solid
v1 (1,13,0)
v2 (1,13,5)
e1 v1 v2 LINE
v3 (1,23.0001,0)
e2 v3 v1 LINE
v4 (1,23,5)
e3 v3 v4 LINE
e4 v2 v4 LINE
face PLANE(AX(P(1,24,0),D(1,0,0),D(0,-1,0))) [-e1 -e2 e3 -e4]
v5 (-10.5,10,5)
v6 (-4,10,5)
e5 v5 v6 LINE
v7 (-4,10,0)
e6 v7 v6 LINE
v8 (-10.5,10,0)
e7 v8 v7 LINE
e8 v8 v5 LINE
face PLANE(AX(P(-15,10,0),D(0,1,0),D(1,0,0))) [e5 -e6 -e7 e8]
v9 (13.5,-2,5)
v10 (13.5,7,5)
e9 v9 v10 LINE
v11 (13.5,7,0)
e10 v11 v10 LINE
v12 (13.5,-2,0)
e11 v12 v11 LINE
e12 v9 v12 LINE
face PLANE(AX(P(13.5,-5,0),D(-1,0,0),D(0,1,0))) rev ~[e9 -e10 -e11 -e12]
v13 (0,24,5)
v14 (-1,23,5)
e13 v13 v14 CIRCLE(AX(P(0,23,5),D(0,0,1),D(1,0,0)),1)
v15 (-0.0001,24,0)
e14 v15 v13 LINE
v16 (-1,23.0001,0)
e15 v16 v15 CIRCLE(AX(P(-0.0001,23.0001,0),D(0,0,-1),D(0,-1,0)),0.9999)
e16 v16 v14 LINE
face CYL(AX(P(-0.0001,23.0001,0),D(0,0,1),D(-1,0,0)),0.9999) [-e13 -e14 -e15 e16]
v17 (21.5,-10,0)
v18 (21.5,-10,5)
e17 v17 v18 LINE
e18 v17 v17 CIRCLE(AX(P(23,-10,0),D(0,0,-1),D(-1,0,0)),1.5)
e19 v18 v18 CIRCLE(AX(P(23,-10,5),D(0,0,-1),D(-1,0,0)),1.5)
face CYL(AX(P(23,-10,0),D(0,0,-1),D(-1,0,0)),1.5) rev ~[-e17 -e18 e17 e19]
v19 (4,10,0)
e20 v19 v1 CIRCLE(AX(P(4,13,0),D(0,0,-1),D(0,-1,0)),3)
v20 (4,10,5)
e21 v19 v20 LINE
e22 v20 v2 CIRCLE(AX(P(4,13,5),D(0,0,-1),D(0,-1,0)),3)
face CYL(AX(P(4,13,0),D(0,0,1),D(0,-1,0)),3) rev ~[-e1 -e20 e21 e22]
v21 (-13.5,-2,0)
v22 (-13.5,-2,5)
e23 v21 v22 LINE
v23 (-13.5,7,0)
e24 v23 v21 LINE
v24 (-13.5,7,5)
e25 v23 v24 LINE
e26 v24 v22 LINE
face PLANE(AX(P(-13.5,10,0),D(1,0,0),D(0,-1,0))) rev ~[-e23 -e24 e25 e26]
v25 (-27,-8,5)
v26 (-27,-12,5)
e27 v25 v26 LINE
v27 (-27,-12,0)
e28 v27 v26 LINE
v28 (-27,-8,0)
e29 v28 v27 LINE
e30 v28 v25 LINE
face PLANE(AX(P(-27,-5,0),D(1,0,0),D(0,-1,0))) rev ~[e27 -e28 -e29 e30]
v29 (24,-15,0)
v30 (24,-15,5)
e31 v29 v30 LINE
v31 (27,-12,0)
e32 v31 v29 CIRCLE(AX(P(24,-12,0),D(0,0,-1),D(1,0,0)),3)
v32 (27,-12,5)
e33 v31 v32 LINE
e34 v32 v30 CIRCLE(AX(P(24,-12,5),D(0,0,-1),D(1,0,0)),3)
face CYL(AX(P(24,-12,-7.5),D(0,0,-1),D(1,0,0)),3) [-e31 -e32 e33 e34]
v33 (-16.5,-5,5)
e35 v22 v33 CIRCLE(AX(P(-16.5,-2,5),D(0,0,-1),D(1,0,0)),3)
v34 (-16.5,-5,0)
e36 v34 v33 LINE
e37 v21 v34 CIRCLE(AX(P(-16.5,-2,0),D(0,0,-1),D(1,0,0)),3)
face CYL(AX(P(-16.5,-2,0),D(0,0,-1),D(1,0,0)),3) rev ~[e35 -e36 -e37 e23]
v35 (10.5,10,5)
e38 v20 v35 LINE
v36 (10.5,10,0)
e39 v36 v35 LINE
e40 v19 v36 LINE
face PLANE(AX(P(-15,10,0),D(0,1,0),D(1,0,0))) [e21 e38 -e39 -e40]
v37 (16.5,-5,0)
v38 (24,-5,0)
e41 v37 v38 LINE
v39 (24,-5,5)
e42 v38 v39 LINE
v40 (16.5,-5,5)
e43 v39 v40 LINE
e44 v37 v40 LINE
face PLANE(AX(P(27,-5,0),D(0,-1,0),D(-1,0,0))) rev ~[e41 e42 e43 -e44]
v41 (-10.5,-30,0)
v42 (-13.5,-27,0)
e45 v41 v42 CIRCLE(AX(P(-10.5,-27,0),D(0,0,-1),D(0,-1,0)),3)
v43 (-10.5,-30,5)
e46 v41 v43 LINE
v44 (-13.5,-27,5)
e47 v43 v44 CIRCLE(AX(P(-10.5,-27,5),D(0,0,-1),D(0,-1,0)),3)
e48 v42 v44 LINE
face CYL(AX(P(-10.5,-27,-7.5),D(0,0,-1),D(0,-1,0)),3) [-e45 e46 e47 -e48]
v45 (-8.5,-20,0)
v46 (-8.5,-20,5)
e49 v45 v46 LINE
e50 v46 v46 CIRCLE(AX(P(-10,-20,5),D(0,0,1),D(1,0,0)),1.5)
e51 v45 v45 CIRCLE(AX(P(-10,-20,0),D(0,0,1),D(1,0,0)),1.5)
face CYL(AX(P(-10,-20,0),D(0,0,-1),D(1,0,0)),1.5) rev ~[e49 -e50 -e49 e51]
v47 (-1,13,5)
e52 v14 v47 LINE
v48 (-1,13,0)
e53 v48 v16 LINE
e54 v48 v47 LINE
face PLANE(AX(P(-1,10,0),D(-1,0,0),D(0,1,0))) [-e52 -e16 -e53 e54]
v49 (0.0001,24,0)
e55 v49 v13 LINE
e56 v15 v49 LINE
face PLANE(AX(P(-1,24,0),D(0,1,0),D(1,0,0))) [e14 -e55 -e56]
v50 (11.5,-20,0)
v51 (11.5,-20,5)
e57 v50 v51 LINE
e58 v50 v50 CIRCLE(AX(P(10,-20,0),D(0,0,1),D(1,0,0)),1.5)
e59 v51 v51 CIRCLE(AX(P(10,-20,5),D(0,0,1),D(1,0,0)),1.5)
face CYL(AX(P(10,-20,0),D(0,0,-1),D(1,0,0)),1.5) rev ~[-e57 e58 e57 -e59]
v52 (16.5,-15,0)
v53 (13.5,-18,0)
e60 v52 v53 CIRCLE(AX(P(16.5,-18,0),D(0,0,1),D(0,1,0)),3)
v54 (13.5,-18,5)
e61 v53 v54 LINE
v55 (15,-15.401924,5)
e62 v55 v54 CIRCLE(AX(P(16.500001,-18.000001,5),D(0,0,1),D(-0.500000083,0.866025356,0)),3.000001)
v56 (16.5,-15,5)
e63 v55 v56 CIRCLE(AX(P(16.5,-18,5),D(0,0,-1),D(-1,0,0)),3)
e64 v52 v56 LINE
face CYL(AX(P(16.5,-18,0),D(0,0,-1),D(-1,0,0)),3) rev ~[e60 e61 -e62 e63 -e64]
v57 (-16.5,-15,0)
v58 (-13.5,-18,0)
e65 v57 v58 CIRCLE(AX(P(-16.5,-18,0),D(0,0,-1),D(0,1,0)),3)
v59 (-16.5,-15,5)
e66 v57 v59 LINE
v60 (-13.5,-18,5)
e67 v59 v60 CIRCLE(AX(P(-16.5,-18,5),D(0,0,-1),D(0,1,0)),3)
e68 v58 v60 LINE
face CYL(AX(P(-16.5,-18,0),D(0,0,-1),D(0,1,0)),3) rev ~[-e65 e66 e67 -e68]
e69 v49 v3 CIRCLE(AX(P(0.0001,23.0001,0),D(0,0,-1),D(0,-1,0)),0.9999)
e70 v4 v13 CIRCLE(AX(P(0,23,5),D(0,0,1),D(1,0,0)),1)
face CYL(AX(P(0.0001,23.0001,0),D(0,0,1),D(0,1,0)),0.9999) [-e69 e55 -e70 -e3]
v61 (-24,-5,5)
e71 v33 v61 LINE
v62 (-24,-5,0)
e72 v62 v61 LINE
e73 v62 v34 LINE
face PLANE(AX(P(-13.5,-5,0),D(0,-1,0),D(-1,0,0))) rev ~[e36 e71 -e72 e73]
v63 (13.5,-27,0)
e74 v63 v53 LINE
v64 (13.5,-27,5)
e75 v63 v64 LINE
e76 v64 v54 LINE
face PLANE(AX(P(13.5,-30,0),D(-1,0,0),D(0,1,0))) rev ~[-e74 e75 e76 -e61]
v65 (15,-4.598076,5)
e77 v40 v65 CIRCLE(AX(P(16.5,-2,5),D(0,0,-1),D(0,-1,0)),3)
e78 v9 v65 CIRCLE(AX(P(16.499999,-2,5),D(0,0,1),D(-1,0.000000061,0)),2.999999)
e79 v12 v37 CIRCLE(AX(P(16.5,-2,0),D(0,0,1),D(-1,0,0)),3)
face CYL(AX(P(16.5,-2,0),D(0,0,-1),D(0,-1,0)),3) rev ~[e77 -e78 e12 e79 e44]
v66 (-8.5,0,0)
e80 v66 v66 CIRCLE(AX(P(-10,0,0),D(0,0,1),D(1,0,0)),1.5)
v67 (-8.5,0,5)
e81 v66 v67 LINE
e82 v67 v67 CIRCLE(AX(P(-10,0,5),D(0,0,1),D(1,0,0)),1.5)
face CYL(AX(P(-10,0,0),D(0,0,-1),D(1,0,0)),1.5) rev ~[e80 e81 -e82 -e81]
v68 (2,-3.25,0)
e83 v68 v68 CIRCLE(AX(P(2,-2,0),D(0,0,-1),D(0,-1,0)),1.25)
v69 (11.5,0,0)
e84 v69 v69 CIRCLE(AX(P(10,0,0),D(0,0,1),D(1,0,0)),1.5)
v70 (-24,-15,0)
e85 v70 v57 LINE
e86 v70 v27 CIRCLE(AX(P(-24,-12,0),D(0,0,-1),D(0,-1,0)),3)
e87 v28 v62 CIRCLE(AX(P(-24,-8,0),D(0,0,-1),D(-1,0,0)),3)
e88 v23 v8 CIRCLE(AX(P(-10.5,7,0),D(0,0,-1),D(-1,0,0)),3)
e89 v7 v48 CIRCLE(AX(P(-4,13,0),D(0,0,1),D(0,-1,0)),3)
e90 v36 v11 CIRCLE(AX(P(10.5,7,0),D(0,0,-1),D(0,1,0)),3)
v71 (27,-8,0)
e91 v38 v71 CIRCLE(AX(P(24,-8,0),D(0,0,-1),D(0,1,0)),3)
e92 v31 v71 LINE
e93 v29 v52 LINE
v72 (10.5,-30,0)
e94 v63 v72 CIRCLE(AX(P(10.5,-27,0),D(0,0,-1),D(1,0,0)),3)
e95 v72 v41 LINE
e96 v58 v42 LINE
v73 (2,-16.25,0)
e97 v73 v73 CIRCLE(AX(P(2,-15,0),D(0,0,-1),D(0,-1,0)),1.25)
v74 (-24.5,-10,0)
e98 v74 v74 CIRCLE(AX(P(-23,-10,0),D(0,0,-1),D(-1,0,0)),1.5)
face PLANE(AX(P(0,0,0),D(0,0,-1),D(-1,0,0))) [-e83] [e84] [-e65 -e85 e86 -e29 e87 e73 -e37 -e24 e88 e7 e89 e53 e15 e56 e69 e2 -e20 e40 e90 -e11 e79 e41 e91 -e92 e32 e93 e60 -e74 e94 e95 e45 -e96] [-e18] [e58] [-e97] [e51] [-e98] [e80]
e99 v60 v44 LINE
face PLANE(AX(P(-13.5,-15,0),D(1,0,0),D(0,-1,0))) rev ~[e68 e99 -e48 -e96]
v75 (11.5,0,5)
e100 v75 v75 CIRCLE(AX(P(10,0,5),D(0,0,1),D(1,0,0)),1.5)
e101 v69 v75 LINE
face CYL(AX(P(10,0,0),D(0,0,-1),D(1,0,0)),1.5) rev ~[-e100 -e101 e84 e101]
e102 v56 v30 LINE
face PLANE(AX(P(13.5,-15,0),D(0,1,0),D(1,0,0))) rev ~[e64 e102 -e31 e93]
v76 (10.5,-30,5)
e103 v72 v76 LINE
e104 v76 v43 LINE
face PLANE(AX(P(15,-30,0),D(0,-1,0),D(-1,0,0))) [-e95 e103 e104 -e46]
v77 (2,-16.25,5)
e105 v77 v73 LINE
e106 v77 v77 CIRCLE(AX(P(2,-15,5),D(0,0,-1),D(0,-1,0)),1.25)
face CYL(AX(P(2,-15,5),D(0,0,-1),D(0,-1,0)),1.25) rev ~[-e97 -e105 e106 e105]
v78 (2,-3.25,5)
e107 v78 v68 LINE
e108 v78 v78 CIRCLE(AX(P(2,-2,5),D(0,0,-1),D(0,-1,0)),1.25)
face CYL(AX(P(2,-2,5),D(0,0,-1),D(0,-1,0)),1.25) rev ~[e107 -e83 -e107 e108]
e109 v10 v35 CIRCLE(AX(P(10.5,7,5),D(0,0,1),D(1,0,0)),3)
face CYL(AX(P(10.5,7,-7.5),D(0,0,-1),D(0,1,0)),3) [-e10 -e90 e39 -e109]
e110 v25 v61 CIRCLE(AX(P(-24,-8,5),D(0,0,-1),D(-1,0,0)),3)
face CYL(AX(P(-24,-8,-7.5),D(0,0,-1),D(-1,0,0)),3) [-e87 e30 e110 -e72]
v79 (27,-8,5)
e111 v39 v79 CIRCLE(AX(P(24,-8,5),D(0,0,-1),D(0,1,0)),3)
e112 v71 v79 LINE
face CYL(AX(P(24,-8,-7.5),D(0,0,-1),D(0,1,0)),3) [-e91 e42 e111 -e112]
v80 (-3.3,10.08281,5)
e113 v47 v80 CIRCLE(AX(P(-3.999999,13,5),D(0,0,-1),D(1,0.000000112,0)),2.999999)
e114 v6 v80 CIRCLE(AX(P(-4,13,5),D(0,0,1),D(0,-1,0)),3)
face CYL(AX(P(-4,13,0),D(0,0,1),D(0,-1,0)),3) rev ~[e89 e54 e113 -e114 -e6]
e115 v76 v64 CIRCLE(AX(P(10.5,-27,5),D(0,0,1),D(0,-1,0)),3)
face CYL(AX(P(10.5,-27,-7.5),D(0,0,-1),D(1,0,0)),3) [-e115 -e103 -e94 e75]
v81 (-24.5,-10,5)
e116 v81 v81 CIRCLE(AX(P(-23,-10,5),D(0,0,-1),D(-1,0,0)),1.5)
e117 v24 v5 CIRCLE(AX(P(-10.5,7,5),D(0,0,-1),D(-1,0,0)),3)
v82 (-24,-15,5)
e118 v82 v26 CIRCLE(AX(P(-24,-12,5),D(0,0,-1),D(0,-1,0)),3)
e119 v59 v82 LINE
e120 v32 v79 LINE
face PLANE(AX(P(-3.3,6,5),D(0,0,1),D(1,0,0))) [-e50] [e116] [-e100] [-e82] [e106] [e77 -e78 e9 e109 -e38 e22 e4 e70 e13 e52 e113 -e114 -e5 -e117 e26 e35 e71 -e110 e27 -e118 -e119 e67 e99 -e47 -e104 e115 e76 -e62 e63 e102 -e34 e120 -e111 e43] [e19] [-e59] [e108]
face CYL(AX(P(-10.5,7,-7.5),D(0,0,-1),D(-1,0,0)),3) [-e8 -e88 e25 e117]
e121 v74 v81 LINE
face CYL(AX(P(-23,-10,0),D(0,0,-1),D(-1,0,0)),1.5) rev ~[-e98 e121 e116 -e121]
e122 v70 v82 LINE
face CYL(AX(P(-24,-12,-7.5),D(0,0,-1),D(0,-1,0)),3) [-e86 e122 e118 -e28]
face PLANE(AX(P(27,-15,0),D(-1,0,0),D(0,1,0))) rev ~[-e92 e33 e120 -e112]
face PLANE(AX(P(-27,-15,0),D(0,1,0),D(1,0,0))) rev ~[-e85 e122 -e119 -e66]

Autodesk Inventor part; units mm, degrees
ref_plane "YZ Plane" through (0, 0, 0) normal (1, 0, 0) x (0, 1, 0)
ref_plane "XZ Plane" through (0, 0, 0) normal (0, 1, 0) x (-1, 0, 0)
ref_plane "XY Plane" through (0, 0, 0) normal (0, 0, 1) x (1, 0, 0)
sketch "Sketch1" plane through (0, 0, 0) normal (0, 0, 1) x (1, 0, 0)
  circle A0 centre (-10, 0) radius 1.5
  circle A1 centre (10, 0) radius 1.5
  circle A2 centre (-10, -20) radius 1.5
  circle A3 centre (10, -20) radius 1.5
  line L0 (-15, 10) -> (15, 10)
  line L1 (15, 10) -> (15, -30)
  line L2 (15, -30) -> (-15, -30)
  line L3 (-15, -30) -> (-15, 10)
  point P0 (0, 0)
  dimension "d0" = 3
  dimension "d1" = 3
  dimension "d2" = 20
  dimension "d3" = 10
  dimension "d4" = 3
  dimension "d5" = 3
  dimension "d6" = 20
  dimension "d7" = 20
  dimension "d8" = 20
  dimension "d9" = 10
  dimension "d10" = 30
  dimension "d11" = 15
  dimension "d12" = 40
  dimension "d13" = 10
extrude "Extrusion1" add sketch "Sketch1" along normal blind 5
sketch "Sketch2" plane through (0, 0, 5) normal (0, 0, 1) x (1, 0, 0)
  line L0 (0, 15.442053) -> (0, -37.541934) construction
  line L1 (-4, 15.442053) -> (-4, -37.541934) construction
  line L2 (-15, -30) -> (15, -30) construction
  line L3 (15, 10) -> (-15, 10)
  line L4 (15, -30) -> (15, 10)
  line L5 (7, 10) -> (7, -30)
  line L6 (7, 10) -> (15, 10)
  line L7 (7, -30) -> (15, -30)
  line L8 (6.3, 15.442053) -> (6.3, 10) construction
  line L9 (6.3, -30) -> (6.3, -37.541934) construction
  line L10 (-15, 10) -> (-15, -30)
  line L11 (15, -30) -> (15, 10)
  point P0 (0, 0)
  dimension "d16" = 4
  dimension "d96" = 0
  dimension "d97" = 0
  dimension "d141" = 22
  dimension "d152" = 0
extrude "Extrusion2" add sketch "Sketch2" along normal blind 10
sketch "Sketch4" plane through (0, 0, 15) normal (0, 0, 1) x (1, 0, 0)
  circle A0 centre (10, 0) radius 3.25
  circle A1 centre (10, -20) radius 1.5 projected
  circle A2 centre (10, -20) radius 3.25
  point P0 (0, 0)
  point P1 (8.5, 0)
  point P2 (8.5, -20)
  dimension "d37" = 6.5
  dimension "d38" = 6.5
extrude "Extrusion3" [suppressed]
sketch "Sketch5" plane through (0, 0, 5) normal (0, 0, 1) x (1, 0, 0)
  line L0 (-4, 15.442053) -> (-4, -37.541934) construction
  line L1 (15, -30) -> (-15, -30)
  line L2 (7, 10) -> (-15, 10)
  line L3 (-3.3, 10) -> (1, 10)
  line L4 (4.5, -30) -> (-3.3, -30)
  line L5 (-3.3, -30) -> (-3.3, 10)
  line L6 (-2, 6) -> (1, 6)
  line L7 (4.5, -26) -> (-2, -26)
  line L8 (-2, -26) -> (-2, 6)
  line L9 (1, 10) -> (1, 6)
  line L10 (4.5, -26) -> (4.5, -30)
  line L11 (7, 10) -> (7, -30)
  point P0 (0, 0)
  point P1 (6.3, 10)
  point P2 (6.3, -30)
  point P3 (15, 10)
  dimension "d111" = 0.7
  dimension "d112" = 4
  dimension "d115" = 4
  dimension "d116" = 1.3
  dimension "d117" = 6
  dimension "d118" = 2.5
  dimension "d139" = 0
  dimension "d140" = 0
extrude "Extrusion4" add sketch "Sketch5" along normal up to surface (10 mm away) contours L1 L5 L2 L9 L6 L8 L7 L10
sketch "Sketch8" plane through (0, 0, 0) normal (0, 0, -1) x (-1, 0, 0)
  line L0 (27, -15) -> (-27, -15)
  line L1 (-27, -15) -> (-27, -5)
  line L2 (-27, -5) -> (27, -5)
  line L3 (27, -5) -> (27, -15)
  line L4 (15, 10) -> (-15, 10) projected
  line L5 (-15, -30) -> (15, -30) projected
  circle A0 centre (23, -10) radius 1.5
  circle A1 centre (-23, -10) radius 1.5
  point P0 (0, 0)
  dimension "d77" = 10
  dimension "d78" = 40
  dimension "d79" = 15
  dimension "d80" = 3
  dimension "d81" = 3
  dimension "d82" = 46
  dimension "d83" = 54
  dimension "d84" = 23
  dimension "d85" = 27
extrude "Extrusion5" add sketch "Sketch8" against normal up to surface (5 mm away)
sketch "Sketch3" plane through (0, 0, 5) normal (0, 0, 1) x (1, 0, 0)
  circle A0 centre (2, -2) radius 1.25
  circle A1 centre (2, -15) radius 1.25
  line L0 (-15, -30) -> (15, -30) projected
  line L1 (15, 10) -> (-15, 10) projected
  point P0 (0, 0)
  point P1 (7, -30)
  point P2 (6.3, 10)
  dimension "d23" = 2.5
  dimension "d24" = 2.5
  dimension "d25" = 15
  dimension "d26" = 2
  dimension "d27" = 2
  dimension "d28" = 12
hole "Hole1" at (2, -2, 5) at (2, -15, 5) direction (0, 0, -1) diameter 2.5 end through all
fillet "Fillet5" [suppressed]
fillet "Fillet7" [suppressed]
sketch "Sketch11" plane through (0, 0, 0) normal (0, 0, -1) x (-1, 0, 0)
  line L0 (15, -15) -> (13.5, -15)
  line L1 (13.5, -5) -> (15, -5)
  line L2 (-15, -5) -> (-13.5, -5)
  line L3 (-13.5, -15) -> (-15, -15)
  line L4 (15, -30) -> (15, -15)
  line L5 (-15, -15) -> (-15, -30)
  line L6 (-15, 10) -> (-15, -5)
  line L7 (15, -5) -> (15, 10)
  line L8 (-15, -30) -> (-13.5, -30)
  line L9 (13.5, -30) -> (15, -30)
  line L10 (-13.5, -30) -> (-13.5, -15)
  line L11 (-13.5, -5) -> (-13.5, 10)
  line L12 (13.5, 10) -> (13.5, -5)
  line L13 (13.5, -15) -> (13.5, -30)
  line L14 (15, 10) -> (13.5, 10)
  line L15 (-15, 10) -> (15, 10) projected
  line L16 (-15, 10) -> (-13.5, 10)
  point P0 (0, 0)
  dimension "d121" = 27
extrude "Extrusion7" cut sketch "Sketch11" against normal through all
fillet "Fillet9" radius 3 12 edges at (-27, -15, 2.5) (-13.5, -30, 2.5) (13.5, -30, 7.5) (-27, -5, 2.5) (-13.5, -5, 2.5) (-13.5, 10, 2.5) (13.5, -15, 7.5) (27, -15, 2.5) (27, -5, 2.5) (13.5, -5, 7.5) (13.5, 10, 7.5) (-13.5, -15, 2.5)
sketch "Sketch12" plane through (4, -30, 4) normal (0, -1, 0) x (1, 0, 0)
  line L0 (0.5, 11) -> (-7.3, 11) projected
  circle A0 centre (-2, 3) radius 1.5
  line L1 (0.5, 1) -> (3, 1) projected
  line L2 (6.5, -4) -> (-14.5, -4) projected
  line L3 (6.5, 11) -> (6.5, -4) projected
  line L4 (-14.5, -4) -> (-14.5, 1) projected
  line L5 (-7.3, 1) -> (-7.3, 11) projected
  line L6 (-14.5, 1) -> (-7.3, 1) projected
  line L7 (3, 11) -> (6.5, 11) projected
  line L8 (3, 1) -> (3, 11) projected
  line L9 (0.5, 1) -> (0.5, 11) projected
  point P0 (-4, -4)
  dimension "d126" = 3
  dimension "d129" = 3
extrude "Extrusion8" [suppressed]
sketch "Sketch14" plane through (0, 0, 0) normal (0, 0, -1) x (-1, 0, 0)
  line L0 (10.5, 10) -> (-10.5, 10) projected
  line L1 (-1, 10) -> (1, 10)
  line L2 (1, 10) -> (1, 24)
  line L3 (1, 24) -> (-1, 24)
  line L4 (-1, 24) -> (-1, 10)
  point P0 (0, 0)
  dimension "d142" = 14
  dimension "d143" = 1
  dimension "d144" = 1
extrude "Extrusion10" add sketch "Sketch14" against normal up to surface (15 mm away)
fillet "Fillet10" radius 3 2 edges at (-1, 10, 7.5) (1, 10, 2.5)
fillet "Fillet11" radius 1 2 edges at (-1, 24, 7.5) (1, 24, 7.5)
sketch "Sketch15" plane through (-3.3, -30, 15) normal (0, 0, 1) x (1, 0, 0)
  arc A0 (2.3, 53) -> (4.3, 53) centre (3.3, 53) ccw
  line L0 (2.3, 43) -> (2.3, 53)
  arc A1 (0, 40.08281) -> (2.3, 43) centre (-0.7, 43) ccw
  line L1 (0, 0) -> (0, 36)
  line L2 (7.8, 0) -> (0, 0)
  line L3 (7.8, 4) -> (7.8, 0)
  line L4 (1.3, 4) -> (7.8, 4)
  line L5 (1.3, 36) -> (1.3, 4)
  line L6 (4.3, 36) -> (1.3, 36)
  line L7 (4.3, 53) -> (4.3, 36)
  line L8 (7.3, 40) -> (7.8, 40)
  arc A2 (4.3, 43) -> (6.8, 40.04196) centre (7.3, 43) ccw
  line L9 (4.3, 53) -> (4.3, 36)
  line L10 (1.3, 36) -> (1.3, 4)
  line L11 (1.3, 36) -> (0, 36)
  line L12 (0, 0) -> (0, 36)
  point P0 (3.3, 30)
extrude "Extrusion11" cut sketch "Sketch15" against normal up to surface (10 mm away)
sketch "Sketch16" plane through (10, 0, 5) normal (0, 0, -1) x (-1, 0, 0)
  circle A0 centre (0, 0) radius 1.5 projected
  circle A1 centre (0, -20) radius 1.5 projected
  point P0 (10, 0)
extrude "Extrusion12" cut sketch "Sketch16" against normal through all
sketch "Sketch17" plane through (-3.3, 6, 15) normal (0, 0, 1) x (1, 0, 0)
  line L0 (4.3, 0) -> (0, 0)
  line L1 (4.3, 17) -> (4.3, 0)
  arc A0 (4.3, 17) -> (2.3, 17) centre (3.3, 17) ccw
  line L2 (2.3, 7) -> (2.3, 17)
  arc A1 (0, 4.08281) -> (2.3, 7) centre (-0.7, 7) ccw
  line L3 (0, 0) -> (0, 4.08281)
  point P0 (3.3, -6)
sketch "Sketch17 outline for Extrusion13" plane through (-3.3, 6, 15) normal (0, 0, 1) x (1, 0, 0)
  line L0 (0, 4.08281) -> (0, 0)
  arc A0 (2.3, 7) -> (0, 4.08281) centre (-0.7, 7) cw
  line L1 (2.3, 17) -> (2.3, 7)
  arc A1 (4.3, 17) -> (2.3, 17) centre (3.3, 17) ccw
  line L2 (4.3, 0) -> (4.3, 17)
  line L3 (0, 0) -> (4.3, 0)
extrude "Extrusion13" cut sketch "Sketch17 outline for Extrusion13" against normal up to surface (10 mm away)
sketch "Sketch18" plane through (0, 0, 15) normal (0, 0, 1) x (1, 0, 0)
  circle A0 centre (10, 0) radius 1.5
  circle A1 centre (10, -20) radius 1.5
  arc A2 (13.5, 7) -> (10.5, 10) centre (10.5, 7) ccw
  line L0 (10.5, 10) -> (7, 10)
  line L1 (7, 10) -> (7, -30)
  line L2 (7, -30) -> (10.5, -30)
  arc A3 (10.5, -30) -> (13.5, -27) centre (10.5, -27) ccw
  line L3 (13.5, -27) -> (13.5, -18)
  arc A4 (15, -15.401924) -> (13.5, -18) centre (16.5, -18) ccw
  line L4 (15, -4.598076) -> (15, -15.401924)
  arc A5 (13.5, -2) -> (15, -4.598076) centre (16.5, -2) ccw
  line L5 (13.5, -2) -> (13.5, 7)
  point P0 (0, 0)
extrude "Extrusion14" cut sketch "Sketch18" against normal up to surface (10 mm away)
sketch "Sketch13" plane through (-10.5, -30, 0) normal (0, -1, 0) x (1, 0, 0)
  line L0 (21, 4) -> (21, 0) projected
  line L1 (0, 0) -> (0, 4) projected
  line L2 (21, 0) -> (0, 0) projected
  circle A0 centre (11, 8) radius 1.5
  line L3 (19.5, 4) -> (21, 4) projected
  line L4 (19.5, 4) -> (19.5, 14) projected
  line L5 (17.5, 14) -> (19.5, 14) projected
  line L6 (17.5, 4) -> (17.5, 14) projected
  line L7 (15, 4) -> (17.5, 4) projected
  line L8 (15, 4) -> (15, 14) projected
  line L9 (15, 14) -> (7.2, 14) projected
  line L10 (7.2, 4) -> (7.2, 14) projected
  line L11 (0, 4) -> (7.2, 4) projected
  point P0 (10.5, 0)
  dimension "d132" = 3
  dimension "d133" = 21
  dimension "d134" = 4
  dimension "d136" = 11
  dimension "d149" = 8
sketch "Sketch9" plane through (0, 0, 5) normal (0, 0, 1) x (1, 0, 0)
  circle A0 centre (-10, 0) radius 1.5 projected
  circle A1 centre (2, -2) radius 1.25 projected
  circle A2 centre (10, 0) radius 1.5 projected
  circle A3 centre (23, -10) radius 1.5 projected
  circle A4 centre (10, -20) radius 1.5 projected
  circle A5 centre (2, -15) radius 1.25 projected
  circle A6 centre (-10, -20) radius 1.5 projected
  circle A7 centre (-23, -10) radius 1.5 projected
  point P0 (0, 0)
equation "\"d3\" = 0.5 * d2"
equation "\"d7\" = d6"
equation "\"d8\" = d2"
equation "\"d9\" = d3"
equation "\"d11\" = 0.5 * d10"
equation "\"d13\" = -0.5 * d6 + 0.5 * d12"
equation "\"d37\" = d38"
equation "\"d115\" = d112"
equation "\"d79\" = -0.5 * d77 + 0.5 * d78"
equation "\"d84\" = 0.5 * d82"
equation "\"d85\" = 0.5 * d83"
equation "\"d27\" = d26"
properties part number "vertical carriage vasi"
